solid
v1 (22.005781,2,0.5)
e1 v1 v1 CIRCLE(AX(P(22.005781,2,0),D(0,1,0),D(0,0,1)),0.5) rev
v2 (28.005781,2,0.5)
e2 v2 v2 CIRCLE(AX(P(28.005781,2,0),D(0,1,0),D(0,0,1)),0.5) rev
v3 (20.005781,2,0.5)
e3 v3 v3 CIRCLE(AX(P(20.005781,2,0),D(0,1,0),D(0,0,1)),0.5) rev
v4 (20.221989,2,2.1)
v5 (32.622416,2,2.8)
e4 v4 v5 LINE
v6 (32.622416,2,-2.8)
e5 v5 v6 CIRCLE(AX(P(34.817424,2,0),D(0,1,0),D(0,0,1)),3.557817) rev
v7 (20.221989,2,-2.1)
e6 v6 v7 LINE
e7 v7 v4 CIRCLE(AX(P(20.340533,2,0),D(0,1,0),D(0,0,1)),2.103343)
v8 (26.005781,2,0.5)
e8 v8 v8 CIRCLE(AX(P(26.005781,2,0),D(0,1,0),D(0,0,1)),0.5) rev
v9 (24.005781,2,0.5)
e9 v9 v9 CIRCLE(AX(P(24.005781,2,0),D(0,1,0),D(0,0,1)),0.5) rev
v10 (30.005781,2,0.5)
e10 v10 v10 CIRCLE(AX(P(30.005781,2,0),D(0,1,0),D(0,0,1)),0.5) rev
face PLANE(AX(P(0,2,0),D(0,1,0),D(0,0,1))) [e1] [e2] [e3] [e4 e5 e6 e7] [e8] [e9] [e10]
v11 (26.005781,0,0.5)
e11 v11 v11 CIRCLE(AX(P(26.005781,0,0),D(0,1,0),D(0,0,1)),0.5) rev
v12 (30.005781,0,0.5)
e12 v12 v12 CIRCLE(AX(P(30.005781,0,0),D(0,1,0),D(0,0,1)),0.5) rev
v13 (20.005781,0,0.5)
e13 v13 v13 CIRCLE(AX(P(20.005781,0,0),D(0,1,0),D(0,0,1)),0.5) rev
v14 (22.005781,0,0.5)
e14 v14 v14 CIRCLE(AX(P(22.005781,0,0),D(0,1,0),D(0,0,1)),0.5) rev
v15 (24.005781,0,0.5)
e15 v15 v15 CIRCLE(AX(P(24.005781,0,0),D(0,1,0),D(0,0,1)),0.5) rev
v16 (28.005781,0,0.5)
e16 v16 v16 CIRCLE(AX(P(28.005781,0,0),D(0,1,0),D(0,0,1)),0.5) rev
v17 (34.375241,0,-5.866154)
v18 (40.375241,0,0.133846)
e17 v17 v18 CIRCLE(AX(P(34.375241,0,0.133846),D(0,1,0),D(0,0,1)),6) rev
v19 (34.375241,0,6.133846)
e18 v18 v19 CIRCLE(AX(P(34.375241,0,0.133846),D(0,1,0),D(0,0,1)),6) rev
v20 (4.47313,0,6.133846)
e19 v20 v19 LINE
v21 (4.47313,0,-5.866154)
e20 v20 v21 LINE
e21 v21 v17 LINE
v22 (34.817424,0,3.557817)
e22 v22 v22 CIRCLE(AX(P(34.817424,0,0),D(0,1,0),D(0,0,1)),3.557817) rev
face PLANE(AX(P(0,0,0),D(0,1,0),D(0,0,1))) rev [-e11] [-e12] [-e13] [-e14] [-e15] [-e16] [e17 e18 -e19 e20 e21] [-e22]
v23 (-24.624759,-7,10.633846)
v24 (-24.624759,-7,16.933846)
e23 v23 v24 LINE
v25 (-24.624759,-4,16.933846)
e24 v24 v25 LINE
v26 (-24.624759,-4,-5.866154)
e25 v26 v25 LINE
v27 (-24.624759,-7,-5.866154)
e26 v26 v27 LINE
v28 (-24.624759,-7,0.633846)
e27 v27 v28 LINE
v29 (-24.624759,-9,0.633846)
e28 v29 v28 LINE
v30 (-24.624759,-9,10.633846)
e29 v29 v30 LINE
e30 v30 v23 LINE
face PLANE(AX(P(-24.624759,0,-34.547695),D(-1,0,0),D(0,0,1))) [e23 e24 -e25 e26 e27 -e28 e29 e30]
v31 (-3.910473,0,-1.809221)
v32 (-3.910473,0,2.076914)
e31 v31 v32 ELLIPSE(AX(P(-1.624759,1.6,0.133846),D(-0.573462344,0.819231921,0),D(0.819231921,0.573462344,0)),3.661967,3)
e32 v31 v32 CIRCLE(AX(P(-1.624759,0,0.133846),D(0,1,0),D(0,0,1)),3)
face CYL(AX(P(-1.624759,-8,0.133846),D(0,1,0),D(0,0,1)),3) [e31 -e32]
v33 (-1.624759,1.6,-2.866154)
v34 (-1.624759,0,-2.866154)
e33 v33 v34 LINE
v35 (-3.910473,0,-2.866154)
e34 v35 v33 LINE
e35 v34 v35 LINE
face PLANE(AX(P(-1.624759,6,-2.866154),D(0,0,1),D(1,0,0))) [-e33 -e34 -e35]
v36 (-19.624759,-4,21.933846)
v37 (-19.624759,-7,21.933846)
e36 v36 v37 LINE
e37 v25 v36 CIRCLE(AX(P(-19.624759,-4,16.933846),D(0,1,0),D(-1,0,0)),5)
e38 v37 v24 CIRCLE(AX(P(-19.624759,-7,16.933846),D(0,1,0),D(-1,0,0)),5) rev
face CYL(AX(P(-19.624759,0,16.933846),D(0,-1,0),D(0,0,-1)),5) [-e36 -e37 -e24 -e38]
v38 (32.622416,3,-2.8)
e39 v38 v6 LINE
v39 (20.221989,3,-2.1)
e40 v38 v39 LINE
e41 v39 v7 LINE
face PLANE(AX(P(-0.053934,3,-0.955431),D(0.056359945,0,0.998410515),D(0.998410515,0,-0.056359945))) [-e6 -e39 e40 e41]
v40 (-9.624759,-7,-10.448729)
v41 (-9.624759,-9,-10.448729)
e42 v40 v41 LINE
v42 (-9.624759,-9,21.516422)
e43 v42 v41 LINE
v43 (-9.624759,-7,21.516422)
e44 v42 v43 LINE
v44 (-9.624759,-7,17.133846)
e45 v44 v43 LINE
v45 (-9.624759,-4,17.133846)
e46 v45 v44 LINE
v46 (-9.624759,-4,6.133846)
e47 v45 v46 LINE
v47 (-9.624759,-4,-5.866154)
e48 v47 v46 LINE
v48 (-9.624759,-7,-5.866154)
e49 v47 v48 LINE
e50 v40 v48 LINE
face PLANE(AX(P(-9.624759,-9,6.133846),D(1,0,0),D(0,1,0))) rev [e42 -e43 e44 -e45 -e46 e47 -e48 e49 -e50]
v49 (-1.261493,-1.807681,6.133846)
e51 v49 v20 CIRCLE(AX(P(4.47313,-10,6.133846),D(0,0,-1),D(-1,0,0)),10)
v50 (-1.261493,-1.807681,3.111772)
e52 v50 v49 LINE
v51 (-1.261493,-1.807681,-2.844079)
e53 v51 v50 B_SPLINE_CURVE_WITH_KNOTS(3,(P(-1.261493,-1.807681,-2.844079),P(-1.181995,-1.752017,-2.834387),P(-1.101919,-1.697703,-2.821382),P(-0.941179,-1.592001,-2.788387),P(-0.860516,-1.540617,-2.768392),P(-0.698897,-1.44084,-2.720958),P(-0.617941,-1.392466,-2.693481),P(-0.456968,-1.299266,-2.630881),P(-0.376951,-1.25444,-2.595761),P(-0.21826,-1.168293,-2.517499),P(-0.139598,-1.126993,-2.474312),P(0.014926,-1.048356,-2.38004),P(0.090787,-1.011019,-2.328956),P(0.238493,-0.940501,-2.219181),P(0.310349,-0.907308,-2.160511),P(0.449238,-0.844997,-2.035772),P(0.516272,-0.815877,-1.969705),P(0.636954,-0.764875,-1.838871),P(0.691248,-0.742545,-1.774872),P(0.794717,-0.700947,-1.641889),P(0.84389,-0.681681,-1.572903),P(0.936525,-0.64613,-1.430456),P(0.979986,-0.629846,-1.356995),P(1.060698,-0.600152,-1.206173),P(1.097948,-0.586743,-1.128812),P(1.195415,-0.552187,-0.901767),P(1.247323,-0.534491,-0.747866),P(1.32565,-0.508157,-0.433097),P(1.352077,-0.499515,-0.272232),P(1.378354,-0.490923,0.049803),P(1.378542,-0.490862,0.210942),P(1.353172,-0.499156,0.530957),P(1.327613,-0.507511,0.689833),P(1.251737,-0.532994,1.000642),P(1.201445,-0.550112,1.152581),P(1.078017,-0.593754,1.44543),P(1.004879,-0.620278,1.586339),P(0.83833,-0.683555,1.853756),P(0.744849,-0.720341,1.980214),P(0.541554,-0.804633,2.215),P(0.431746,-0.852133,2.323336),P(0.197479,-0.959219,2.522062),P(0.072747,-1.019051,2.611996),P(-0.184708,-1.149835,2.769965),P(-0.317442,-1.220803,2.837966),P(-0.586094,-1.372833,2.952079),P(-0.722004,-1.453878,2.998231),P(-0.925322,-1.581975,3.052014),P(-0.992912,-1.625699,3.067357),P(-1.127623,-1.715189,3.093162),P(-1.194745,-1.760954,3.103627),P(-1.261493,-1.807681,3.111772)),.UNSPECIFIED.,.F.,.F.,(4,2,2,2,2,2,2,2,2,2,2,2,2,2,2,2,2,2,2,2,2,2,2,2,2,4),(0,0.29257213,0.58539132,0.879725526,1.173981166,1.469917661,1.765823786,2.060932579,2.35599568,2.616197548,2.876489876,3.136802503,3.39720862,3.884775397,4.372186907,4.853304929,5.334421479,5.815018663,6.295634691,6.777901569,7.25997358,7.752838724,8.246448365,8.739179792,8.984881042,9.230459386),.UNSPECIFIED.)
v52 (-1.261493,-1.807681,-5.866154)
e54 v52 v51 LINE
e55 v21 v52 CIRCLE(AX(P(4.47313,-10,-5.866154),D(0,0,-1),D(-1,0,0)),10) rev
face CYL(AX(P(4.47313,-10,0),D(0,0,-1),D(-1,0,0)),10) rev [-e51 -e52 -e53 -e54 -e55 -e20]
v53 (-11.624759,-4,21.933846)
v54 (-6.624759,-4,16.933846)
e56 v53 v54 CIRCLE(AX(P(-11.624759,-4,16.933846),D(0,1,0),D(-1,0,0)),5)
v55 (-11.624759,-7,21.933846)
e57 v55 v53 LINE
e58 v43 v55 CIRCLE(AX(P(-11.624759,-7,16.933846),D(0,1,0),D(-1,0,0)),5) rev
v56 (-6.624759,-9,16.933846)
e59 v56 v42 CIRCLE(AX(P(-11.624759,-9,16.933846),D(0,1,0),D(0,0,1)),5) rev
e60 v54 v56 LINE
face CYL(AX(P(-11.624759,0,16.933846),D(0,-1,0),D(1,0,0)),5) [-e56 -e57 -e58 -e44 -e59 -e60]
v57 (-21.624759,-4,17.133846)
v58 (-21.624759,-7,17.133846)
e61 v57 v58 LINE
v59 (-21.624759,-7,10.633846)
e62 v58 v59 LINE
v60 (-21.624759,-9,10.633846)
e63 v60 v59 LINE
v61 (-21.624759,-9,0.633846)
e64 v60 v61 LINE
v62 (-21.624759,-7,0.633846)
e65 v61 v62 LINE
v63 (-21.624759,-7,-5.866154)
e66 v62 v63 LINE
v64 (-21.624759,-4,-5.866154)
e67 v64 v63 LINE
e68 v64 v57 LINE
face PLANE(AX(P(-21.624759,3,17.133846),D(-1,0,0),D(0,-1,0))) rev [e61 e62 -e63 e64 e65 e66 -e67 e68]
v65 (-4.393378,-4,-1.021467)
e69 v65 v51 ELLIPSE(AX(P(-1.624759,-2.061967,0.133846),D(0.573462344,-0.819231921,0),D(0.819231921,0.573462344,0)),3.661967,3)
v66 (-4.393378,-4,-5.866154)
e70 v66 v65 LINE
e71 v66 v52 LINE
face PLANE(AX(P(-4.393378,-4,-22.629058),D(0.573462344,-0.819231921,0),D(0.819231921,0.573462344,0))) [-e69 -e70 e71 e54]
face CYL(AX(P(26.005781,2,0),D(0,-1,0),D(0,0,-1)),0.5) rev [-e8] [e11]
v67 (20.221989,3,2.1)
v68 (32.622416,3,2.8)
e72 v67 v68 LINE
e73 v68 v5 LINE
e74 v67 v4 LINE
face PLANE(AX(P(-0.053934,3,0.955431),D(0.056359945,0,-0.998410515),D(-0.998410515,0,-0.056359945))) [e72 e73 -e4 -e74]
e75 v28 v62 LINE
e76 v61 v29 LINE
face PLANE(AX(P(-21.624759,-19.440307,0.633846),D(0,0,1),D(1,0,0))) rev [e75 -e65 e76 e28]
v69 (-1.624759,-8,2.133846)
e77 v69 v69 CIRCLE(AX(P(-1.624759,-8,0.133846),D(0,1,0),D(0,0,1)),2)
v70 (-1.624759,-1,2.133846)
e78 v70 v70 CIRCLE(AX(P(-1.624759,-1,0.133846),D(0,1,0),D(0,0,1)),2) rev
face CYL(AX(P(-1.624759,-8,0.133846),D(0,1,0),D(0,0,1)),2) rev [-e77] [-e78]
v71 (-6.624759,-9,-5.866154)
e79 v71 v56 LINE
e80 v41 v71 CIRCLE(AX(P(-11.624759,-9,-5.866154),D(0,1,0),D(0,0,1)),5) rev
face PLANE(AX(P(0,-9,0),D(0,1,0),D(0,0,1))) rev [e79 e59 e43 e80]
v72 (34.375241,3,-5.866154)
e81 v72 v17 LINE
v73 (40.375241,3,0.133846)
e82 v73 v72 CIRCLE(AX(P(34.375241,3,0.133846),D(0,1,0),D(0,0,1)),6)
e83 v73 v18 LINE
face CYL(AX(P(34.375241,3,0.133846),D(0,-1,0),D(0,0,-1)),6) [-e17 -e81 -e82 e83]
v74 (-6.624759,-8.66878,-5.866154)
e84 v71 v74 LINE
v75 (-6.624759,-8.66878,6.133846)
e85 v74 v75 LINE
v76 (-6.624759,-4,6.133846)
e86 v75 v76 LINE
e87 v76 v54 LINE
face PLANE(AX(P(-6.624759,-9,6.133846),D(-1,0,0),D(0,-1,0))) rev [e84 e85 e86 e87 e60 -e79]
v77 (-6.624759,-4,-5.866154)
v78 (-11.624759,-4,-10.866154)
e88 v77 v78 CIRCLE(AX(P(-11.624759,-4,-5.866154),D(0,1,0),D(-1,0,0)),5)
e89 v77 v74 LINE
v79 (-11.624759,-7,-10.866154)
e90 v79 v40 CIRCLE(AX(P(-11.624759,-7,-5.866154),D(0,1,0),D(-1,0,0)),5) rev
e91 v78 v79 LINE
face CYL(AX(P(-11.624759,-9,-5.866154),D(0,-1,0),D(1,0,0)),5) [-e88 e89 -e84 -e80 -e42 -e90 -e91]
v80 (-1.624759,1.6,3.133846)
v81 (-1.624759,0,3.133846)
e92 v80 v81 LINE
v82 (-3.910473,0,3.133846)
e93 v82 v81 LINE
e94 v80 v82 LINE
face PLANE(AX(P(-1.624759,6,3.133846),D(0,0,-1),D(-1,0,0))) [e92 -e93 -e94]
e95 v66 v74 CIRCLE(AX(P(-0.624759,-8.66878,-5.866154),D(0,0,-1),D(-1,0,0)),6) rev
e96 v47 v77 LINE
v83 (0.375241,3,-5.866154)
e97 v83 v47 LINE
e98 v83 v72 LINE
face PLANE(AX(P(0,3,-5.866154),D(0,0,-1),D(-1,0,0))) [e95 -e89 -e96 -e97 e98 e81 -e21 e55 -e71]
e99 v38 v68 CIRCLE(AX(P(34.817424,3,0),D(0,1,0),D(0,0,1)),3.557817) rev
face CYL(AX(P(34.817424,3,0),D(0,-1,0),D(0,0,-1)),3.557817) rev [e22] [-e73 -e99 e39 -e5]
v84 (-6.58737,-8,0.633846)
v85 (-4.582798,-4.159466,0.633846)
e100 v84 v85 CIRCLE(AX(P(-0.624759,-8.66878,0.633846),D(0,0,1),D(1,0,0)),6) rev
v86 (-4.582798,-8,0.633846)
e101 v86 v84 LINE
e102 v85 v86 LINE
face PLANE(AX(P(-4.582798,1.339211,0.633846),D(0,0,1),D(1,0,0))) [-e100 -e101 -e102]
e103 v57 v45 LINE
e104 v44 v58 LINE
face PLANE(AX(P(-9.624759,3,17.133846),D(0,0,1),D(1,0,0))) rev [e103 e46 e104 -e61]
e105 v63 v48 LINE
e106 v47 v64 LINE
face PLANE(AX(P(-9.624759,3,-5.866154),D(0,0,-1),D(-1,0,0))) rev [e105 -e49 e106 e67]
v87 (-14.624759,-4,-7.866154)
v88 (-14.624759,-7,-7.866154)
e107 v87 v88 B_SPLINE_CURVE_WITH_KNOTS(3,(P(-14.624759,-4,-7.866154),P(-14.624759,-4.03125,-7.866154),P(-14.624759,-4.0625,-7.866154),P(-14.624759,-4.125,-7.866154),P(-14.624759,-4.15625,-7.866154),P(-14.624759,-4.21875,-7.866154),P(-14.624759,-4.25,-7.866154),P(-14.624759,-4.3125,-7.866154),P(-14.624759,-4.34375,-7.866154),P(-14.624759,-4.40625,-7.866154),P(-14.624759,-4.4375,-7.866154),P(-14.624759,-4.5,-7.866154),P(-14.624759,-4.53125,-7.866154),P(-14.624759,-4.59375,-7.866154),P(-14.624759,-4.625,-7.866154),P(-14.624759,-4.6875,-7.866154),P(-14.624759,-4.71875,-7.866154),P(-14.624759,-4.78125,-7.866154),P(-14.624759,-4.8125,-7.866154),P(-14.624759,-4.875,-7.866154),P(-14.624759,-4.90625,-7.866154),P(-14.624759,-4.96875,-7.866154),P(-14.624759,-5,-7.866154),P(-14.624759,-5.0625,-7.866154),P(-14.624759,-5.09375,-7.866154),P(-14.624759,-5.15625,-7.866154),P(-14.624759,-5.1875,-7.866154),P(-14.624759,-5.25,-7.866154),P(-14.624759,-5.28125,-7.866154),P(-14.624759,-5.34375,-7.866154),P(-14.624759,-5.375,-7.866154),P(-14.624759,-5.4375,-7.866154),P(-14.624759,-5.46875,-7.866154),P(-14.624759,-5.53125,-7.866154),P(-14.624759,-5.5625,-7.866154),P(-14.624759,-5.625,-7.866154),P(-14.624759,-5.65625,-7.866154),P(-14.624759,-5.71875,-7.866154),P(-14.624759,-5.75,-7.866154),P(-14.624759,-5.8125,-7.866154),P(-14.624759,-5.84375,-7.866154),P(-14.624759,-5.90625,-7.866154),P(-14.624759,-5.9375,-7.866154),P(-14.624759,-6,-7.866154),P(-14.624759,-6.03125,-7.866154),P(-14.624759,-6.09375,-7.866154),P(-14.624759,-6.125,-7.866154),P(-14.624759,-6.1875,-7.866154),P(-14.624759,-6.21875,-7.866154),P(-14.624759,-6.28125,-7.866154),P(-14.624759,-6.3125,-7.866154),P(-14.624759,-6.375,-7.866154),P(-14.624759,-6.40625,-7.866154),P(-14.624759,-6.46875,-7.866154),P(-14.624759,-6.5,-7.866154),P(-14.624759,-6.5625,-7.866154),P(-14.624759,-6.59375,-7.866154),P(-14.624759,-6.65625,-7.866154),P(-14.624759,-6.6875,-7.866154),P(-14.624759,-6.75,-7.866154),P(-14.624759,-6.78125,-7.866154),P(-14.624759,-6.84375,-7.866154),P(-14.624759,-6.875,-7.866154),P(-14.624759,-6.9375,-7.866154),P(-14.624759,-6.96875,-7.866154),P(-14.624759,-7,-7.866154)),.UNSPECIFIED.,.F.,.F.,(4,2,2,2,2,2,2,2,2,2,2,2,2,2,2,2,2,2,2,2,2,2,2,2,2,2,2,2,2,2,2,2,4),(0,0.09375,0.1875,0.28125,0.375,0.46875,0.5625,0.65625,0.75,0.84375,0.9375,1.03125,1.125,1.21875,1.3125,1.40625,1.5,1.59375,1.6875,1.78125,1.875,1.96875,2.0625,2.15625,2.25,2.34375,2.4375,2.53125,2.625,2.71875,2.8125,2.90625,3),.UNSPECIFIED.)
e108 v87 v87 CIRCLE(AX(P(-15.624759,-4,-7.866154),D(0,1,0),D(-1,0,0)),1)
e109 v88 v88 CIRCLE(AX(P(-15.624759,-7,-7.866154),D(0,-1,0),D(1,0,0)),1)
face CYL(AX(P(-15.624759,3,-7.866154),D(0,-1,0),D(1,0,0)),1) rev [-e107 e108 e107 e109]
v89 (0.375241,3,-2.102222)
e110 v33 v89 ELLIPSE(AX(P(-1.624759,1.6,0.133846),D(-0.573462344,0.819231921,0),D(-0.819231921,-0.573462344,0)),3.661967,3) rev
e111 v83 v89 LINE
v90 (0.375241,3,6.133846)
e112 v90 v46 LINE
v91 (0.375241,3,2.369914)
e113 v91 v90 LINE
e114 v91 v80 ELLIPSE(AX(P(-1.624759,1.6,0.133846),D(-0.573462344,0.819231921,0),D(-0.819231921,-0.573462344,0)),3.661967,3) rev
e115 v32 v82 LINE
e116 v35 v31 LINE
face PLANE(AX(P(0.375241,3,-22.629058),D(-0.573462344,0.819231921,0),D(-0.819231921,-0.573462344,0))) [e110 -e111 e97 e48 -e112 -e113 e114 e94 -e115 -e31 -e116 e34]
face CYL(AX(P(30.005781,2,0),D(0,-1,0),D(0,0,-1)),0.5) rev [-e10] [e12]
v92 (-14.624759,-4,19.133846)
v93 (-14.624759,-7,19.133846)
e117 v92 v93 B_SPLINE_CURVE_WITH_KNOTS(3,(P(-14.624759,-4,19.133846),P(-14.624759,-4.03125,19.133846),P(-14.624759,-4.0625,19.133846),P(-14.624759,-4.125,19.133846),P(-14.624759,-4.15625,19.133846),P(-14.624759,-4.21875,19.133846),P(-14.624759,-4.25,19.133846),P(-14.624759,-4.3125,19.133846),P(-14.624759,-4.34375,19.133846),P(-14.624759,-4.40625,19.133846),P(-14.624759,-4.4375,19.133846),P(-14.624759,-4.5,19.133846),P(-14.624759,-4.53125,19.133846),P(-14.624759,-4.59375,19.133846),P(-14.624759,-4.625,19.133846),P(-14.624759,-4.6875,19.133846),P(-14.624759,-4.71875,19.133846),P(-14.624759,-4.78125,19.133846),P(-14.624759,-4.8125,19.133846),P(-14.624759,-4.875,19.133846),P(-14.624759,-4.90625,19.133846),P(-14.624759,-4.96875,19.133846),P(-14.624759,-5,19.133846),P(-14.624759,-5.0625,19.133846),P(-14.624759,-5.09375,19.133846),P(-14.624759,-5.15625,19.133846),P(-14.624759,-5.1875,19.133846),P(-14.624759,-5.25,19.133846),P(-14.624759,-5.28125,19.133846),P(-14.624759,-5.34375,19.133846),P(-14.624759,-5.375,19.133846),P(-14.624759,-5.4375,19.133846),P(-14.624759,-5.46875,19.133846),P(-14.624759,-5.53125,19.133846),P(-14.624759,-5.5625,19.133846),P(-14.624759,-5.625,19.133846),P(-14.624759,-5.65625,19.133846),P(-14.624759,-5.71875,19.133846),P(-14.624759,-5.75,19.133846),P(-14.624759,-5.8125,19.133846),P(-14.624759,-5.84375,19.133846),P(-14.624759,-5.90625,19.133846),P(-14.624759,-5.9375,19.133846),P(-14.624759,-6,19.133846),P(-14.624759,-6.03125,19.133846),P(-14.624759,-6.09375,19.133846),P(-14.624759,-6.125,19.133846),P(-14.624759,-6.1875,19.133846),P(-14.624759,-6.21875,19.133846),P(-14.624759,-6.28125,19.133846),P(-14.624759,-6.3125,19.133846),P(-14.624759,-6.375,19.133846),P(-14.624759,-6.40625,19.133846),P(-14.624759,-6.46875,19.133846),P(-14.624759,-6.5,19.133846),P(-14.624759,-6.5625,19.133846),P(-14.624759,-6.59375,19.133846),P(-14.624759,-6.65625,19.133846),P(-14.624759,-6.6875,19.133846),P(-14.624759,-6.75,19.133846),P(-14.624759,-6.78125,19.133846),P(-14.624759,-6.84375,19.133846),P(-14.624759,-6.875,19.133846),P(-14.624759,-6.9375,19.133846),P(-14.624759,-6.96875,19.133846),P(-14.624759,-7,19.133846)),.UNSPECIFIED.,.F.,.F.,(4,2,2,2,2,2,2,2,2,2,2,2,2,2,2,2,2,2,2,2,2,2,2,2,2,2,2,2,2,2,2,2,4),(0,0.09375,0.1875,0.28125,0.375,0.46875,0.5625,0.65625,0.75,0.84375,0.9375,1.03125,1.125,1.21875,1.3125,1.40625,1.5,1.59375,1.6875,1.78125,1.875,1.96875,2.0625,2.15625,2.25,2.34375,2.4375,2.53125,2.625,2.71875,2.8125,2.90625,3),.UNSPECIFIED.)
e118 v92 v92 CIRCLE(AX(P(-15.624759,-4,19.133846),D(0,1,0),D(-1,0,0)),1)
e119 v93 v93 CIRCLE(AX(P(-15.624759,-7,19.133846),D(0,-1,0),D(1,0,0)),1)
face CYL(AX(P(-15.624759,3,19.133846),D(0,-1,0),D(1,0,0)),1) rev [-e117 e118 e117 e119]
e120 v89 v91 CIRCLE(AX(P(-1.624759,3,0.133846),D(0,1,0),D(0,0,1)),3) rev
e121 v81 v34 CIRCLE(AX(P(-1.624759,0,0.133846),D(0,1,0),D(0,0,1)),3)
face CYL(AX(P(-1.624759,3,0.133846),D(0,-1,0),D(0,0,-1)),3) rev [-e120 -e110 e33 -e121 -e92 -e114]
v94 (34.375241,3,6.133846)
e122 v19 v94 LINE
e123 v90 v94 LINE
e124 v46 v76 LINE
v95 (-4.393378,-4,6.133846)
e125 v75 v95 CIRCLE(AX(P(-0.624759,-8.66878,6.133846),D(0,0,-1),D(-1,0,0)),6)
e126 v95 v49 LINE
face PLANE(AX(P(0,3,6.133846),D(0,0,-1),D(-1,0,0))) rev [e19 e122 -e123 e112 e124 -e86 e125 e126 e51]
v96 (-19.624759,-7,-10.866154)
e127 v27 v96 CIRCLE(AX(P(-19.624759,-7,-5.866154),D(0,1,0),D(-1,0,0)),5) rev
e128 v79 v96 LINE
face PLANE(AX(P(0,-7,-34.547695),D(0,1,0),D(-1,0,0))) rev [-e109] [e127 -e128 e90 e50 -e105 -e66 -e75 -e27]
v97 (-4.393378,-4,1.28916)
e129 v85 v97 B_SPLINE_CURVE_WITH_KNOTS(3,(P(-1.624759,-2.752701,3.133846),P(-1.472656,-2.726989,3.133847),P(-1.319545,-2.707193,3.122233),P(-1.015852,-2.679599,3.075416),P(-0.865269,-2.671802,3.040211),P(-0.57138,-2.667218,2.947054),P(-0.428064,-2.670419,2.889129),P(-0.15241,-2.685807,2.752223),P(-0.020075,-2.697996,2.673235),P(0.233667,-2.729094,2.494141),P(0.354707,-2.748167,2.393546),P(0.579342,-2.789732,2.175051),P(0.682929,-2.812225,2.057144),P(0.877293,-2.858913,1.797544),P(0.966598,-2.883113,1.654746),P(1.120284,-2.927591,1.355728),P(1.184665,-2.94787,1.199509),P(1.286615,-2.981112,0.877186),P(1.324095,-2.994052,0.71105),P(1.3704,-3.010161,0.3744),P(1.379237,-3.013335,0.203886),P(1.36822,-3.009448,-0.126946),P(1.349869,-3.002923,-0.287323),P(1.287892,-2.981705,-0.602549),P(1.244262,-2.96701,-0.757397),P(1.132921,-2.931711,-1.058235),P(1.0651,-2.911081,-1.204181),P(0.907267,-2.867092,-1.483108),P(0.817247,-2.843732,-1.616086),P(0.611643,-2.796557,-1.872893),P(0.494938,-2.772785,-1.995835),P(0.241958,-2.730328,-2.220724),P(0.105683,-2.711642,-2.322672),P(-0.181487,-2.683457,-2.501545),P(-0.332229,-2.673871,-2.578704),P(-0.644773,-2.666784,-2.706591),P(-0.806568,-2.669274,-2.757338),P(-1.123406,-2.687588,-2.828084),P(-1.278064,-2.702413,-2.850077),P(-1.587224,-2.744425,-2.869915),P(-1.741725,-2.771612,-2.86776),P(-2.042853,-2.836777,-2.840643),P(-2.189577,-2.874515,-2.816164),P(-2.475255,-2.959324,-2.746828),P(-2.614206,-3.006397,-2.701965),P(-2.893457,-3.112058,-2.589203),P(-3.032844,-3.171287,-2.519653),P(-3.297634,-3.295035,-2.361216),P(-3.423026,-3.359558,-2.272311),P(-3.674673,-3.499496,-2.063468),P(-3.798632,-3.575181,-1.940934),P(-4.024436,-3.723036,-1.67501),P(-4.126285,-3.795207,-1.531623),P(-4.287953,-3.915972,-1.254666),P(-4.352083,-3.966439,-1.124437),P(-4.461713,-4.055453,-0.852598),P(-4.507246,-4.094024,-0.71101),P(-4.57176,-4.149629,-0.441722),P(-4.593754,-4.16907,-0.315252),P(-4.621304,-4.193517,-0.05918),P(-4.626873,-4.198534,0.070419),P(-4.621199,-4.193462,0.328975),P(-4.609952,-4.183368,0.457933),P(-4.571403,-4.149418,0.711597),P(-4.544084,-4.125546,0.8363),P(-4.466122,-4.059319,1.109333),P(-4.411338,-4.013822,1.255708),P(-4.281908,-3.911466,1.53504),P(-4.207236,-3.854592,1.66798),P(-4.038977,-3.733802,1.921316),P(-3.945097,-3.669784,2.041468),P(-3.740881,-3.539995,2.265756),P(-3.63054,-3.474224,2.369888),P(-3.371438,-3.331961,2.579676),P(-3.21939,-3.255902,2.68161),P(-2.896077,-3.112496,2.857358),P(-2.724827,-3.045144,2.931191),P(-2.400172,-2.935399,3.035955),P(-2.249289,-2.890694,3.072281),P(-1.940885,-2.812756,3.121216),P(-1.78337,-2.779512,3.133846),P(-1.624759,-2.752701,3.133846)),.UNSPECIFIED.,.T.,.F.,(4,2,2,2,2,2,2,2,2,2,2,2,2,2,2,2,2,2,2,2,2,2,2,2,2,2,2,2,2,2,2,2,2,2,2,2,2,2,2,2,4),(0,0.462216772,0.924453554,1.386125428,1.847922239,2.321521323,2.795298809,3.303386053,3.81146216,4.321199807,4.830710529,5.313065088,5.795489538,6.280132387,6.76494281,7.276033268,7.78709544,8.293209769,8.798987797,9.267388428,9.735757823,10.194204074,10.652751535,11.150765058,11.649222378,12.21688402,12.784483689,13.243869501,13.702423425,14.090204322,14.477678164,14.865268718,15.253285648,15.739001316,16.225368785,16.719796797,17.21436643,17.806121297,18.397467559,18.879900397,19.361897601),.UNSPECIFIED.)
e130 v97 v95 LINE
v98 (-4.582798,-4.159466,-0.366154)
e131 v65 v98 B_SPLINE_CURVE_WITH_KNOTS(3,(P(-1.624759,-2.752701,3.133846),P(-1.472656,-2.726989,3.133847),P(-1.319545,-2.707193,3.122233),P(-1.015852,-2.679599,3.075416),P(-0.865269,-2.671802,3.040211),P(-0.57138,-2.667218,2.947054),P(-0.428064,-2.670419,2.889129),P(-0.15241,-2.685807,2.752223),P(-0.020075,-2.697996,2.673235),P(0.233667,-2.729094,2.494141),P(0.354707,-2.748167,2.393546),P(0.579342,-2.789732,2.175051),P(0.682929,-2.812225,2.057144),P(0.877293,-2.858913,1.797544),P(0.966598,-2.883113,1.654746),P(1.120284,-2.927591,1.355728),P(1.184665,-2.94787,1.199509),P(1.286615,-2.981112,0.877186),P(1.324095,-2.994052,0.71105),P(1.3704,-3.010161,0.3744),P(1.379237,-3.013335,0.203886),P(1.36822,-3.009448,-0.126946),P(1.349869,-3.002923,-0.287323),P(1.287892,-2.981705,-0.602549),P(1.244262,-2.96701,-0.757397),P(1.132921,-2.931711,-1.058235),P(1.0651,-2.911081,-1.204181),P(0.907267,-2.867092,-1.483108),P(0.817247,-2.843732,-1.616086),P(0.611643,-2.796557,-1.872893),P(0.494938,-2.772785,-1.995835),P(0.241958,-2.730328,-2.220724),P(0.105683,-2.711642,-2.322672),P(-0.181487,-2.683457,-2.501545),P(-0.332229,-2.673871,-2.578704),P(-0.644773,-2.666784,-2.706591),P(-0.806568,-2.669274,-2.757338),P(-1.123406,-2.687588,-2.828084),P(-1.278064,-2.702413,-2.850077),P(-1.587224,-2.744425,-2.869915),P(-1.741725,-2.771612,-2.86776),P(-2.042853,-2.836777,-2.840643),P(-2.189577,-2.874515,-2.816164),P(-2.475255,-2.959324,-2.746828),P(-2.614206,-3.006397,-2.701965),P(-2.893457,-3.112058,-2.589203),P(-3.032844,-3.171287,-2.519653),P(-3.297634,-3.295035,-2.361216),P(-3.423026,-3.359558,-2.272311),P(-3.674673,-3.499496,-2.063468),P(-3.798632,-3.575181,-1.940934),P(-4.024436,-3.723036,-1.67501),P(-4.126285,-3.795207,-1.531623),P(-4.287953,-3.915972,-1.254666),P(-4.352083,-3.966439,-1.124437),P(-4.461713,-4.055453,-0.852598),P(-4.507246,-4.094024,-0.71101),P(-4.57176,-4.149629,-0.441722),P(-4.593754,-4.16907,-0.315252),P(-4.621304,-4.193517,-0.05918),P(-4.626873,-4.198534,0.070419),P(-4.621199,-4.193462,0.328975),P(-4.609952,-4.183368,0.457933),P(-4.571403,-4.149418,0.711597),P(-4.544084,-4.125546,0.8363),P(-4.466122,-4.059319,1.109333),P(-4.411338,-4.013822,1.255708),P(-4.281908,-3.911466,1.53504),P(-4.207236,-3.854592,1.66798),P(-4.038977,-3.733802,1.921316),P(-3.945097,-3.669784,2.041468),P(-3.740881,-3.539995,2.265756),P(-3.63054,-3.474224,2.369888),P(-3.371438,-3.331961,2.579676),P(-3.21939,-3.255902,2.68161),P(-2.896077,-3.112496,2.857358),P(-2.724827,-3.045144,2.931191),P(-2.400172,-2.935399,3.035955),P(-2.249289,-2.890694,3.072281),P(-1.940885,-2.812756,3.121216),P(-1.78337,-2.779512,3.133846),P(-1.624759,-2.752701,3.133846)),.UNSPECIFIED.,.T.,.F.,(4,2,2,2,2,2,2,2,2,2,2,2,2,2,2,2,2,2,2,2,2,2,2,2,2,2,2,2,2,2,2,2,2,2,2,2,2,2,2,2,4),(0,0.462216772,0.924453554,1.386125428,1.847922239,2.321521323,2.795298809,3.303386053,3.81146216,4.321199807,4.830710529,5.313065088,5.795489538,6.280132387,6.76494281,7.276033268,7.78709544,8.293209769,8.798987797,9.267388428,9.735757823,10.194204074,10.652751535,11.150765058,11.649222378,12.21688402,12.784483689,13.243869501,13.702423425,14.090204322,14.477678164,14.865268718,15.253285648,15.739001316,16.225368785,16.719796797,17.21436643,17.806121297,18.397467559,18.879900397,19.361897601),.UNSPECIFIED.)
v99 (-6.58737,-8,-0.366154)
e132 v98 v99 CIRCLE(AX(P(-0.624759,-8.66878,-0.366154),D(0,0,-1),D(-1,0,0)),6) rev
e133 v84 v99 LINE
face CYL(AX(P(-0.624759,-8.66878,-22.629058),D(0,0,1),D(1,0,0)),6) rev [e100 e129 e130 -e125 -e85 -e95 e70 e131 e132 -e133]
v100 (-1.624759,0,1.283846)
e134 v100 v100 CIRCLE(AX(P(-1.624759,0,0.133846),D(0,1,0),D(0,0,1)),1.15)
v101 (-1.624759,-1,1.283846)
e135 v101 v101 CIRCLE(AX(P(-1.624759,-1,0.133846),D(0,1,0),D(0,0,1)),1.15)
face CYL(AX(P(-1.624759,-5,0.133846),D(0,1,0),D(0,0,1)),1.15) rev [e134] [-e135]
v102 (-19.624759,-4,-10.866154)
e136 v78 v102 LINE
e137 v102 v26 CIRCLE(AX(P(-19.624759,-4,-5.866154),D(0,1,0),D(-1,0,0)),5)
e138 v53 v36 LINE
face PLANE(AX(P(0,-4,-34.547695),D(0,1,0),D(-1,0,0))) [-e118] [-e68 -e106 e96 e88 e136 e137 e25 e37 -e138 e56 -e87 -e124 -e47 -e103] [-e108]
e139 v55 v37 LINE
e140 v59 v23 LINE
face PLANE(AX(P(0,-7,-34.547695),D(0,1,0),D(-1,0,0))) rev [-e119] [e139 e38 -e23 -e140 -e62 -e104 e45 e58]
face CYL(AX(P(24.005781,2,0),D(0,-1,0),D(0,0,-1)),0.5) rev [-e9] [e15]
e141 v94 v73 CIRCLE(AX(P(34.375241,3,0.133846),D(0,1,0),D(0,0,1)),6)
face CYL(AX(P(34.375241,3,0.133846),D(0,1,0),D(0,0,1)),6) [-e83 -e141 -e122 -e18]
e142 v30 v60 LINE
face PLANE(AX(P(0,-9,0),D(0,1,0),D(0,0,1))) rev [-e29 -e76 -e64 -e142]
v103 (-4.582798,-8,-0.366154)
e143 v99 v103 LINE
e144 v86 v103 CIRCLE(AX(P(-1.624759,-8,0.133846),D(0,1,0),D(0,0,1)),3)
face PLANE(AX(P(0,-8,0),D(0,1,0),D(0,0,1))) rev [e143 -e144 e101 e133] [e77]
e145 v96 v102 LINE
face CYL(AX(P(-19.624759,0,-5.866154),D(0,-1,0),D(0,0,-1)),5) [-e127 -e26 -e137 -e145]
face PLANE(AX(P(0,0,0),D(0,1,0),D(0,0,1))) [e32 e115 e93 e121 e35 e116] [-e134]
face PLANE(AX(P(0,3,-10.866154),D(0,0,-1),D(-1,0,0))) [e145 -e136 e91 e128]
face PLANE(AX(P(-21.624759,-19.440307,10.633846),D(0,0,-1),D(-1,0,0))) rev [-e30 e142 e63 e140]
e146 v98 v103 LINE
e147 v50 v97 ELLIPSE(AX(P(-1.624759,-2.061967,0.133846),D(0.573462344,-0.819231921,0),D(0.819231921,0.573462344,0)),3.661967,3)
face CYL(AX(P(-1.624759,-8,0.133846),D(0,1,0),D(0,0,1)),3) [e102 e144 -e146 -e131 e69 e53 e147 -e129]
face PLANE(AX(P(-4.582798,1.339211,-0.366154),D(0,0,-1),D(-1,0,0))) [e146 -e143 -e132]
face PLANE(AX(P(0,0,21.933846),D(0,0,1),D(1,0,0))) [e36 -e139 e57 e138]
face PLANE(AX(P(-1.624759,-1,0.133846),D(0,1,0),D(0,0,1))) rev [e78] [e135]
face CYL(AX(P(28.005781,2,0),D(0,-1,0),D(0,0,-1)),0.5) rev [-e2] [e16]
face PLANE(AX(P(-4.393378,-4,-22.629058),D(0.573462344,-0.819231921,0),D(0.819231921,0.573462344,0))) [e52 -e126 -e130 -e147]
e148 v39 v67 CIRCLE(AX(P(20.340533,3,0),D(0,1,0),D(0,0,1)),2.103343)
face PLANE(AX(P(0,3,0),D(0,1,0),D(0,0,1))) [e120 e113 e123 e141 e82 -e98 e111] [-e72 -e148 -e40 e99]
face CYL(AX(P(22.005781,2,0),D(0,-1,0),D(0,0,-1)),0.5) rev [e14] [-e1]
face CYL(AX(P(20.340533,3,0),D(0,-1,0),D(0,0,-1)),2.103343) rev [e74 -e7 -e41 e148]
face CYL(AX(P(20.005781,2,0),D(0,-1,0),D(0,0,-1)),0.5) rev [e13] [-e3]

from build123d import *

# Parameters (mm, degrees)
BOSS_EXTRUDE1_DEPTH     = 3
SKETCH1_7_R             = 0.5
BOSS_EXTRUDE2_DEPTH     = 2
BOSS_EXTRUDE4_REACH     = 44.227
SKETCH4_W               = 3
SKETCH4_H               = 12
BOSS_EXTRUDE5_DEPTH     = 5
FILLET3_R               = 10
BOSS_EXTRUDE11_START    = -17
BOSS_EXTRUDE11_DEPTH    = 32.8
SKETCH12_R              = 1
SKETCH12_W              = 12
SKETCH12_H              = 23
CUT_EXTRUDE2_DEPTH      = 48.02396982
FILLET7_R               = 6
FILLET8_R               = 6
SKETCH13_W              = 3
SKETCH13_H              = 10
BOSS_EXTRUDE12_DEPTH    = 2
FILLET9_R               = 5
BOSS_EXTRUDE13_START    = -8
SKETCH1_9_R             = 3
SKETCH1_9_R_2           = 2
BOSS_EXTRUDE13_DEPTH    = 8
CUT_EXTRUDE3_DEPTH      = 8
CUT_EXTRUDE3_DEPTH_BACK = 8
SKETCH1_10_R            = 2
SKETCH1_10_R_2          = 1.15
BOSS_EXTRUDE14_START    = -1
SKETCH1_11_R            = 2
BOSS_EXTRUDE14_DEPTH    = 1
SKETCH1_12_R            = 3
CUT_EXTRUDE4_DEPTH      = 5
SKETCH1_13_R            = 1.15
CUT_EXTRUDE5_DEPTH      = 5
SKETCH17_W              = 11.286302552
SKETCH17_H              = 6
CUT_EXTRUDE6_DEPTH      = 6
BOSS_EXTRUDE15_START    = -3.840535
SKETCH18_W              = 2.041960109
SKETCH18_H              = 1
BOSS_EXTRUDE15_DEPTH    = 3.840535


# Read off the part's stored shape, not the designer's step: Boss-Extrude11
# Some blends are built 0.0001 mm under size
with BuildPart() as part:
    # Sketch1 → Boss-Extrude1 (new body)
    with BuildSketch(Plane(origin=(0, 0, 0), x_dir=(1, 0, 0), z_dir=(0, 1, 0))):
        with BuildLine():
            Line((40.375241408, 5.866153579), (0.375241408, 5.866153579))
            Line((0.375241408, 5.866153579), (0.375241408, 2.102221557))
            ThreePointArc((0.375241408, 2.102221557), (1.113854196, 1.090898451), (1.375241408, -0.133846421))
            ThreePointArc((1.375241408, -0.133846421), (1.113854196, -1.358591292), (0.375241408, -2.369914398))
            Line((0.375241408, -2.369914398), (0.375241408, -6.133846421))
            Line((0.375241408, -6.133846421), (40.375241408, -6.133846421))
            Line((40.375241408, -6.133846421), (40.375241408, 5.866153579))
        make_face()
        with BuildLine():
            Line((32.622415803, -2.8), (20.221989119, -2.1))
            ThreePointArc((20.221989119, -2.1), (18.237190195, 0), (20.221989119, 2.1))
            Line((20.221989119, 2.1), (32.622415803, 2.8))
            ThreePointArc((32.622415803, 2.8), (36.374444489, 3.199023384), (38.375241408, 0))
            ThreePointArc((38.375241408, 0), (36.374444489, -3.199023384), (32.622415803, -2.8))
        make_face(mode=Mode.SUBTRACT)
    extrude(amount=BOSS_EXTRUDE1_DEPTH)

    # Sketch1<7> → Boss-Extrude2 (add)
    with BuildSketch(Plane(origin=(0, 0, 0), x_dir=(1, 0, 0), z_dir=(0, 1, 0))):
        with BuildLine():
            ThreePointArc((20.221989119, 2.1), (18.237190195, 0), (20.221989119, -2.1))
            Line((20.221989119, -2.1), (32.622415803, -2.8))
            ThreePointArc((32.622415803, -2.8), (31.259607239, 0), (32.622415803, 2.8))
            Line((32.622415803, 2.8), (20.221989119, 2.1))
        make_face()
        with Locations(Location((20.005781193, 0, 0), (0, 0, 270))):
            Circle(SKETCH1_7_R, mode=Mode.SUBTRACT)
        with Locations(Location((22.005781193, 0, 0), (0, 0, 270))):
            Circle(SKETCH1_7_R, mode=Mode.SUBTRACT)
        with Locations(Location((24.005781193, 0, 0), (0, 0, 270))):
            Circle(SKETCH1_7_R, mode=Mode.SUBTRACT)
        with Locations(Location((26.005781193, 0, 0), (0, 0, 270))):
            Circle(SKETCH1_7_R, mode=Mode.SUBTRACT)
        with Locations(Location((28.005781193, 0, 0), (0, 0, 270))):
            Circle(SKETCH1_7_R, mode=Mode.SUBTRACT)
        with Locations(Location((30.005781193, 0, 0), (0, 0, 270))):
            Circle(SKETCH1_7_R, mode=Mode.SUBTRACT)
    extrude(amount=BOSS_EXTRUDE2_DEPTH)

    # Boss-Extrude4: up to this face of the body (flat: up to its plane)
    boss_extrude4_end = Plane(part.part.faces().sort_by_distance((20.375241408, 1.5, -5.866153579))[0])
    # Sketch3 → Boss-Extrude4 (add, up to the picked face)
    with BuildSketch(Plane.XY.offset(6.133846421), mode=Mode.PRIVATE) as boss_extrude4_sk1:
        Polygon((0.375241408, 3), (-9.624758592, -4), (-4.393377613, -4), (5.606622387, 3), align=None)
    boss_extrude4_tool1 = split(extrude(boss_extrude4_sk1.sketch, amount=-BOSS_EXTRUDE4_REACH, mode=Mode.PRIVATE), bisect_by=boss_extrude4_end, keep=Keep.BOTH, mode=Mode.PRIVATE)
    add(boss_extrude4_tool1.solids().sort_by(Axis((-2.009068, -0.5, 6.133846), (0, 0, -1)))[0])

    # Sketch4 → Boss-Extrude5 (add)
    with BuildSketch(Plane(origin=(0, -4, 0), x_dir=(-1, 0, 0), z_dir=(0, -1, 0))):
        with Locations((8.124758592, -0.133846421)):
            Rectangle(SKETCH4_W, SKETCH4_H)
    extrude(amount=BOSS_EXTRUDE5_DEPTH)

    # Fillet3
    # the kernel refuses this fillet: 10 mm, written as the material it adds along each edge
    with BuildSketch(Plane(origin=(1.320908101, 0, 6.133846421), x_dir=(1, 0, 0), z_dir=(0, 0, -1))) as fillet3_piece_1_section:
        with BuildLine():
            CenterArc((FILLET3_R * 0.315222230819, FILLET3_R), FILLET3_R, 235.007979801, 34.992020199)
            Line((-FILLET3_R * 0.258240113544, FILLET3_R * 0.180768079481), (0, 0))
            Line((0, 0), (FILLET3_R * 0.315222230819, 0))
        make_face()
    fillet3_piece_1 = extrude(amount=13.312182885, mode=Mode.PRIVATE)
    fillet3_piece_1 = split(fillet3_piece_1, bisect_by=Plane(origin=(1.586628452, -0.313093782, -5.866153579), z_dir=(0, 0, 1)), keep=Keep.TOP, mode=Mode.PRIVATE)
    fillet3_piece_1 = fillet3_piece_1 - Plane(origin=(-1.624758592, -0.313093782, 0.133846421), x_dir=(0.6666666666666657, 0, -0.7453559924999308), z_dir=(0, -1, 0)) * Cylinder(3, 40, mode=Mode.PRIVATE)
    add(fillet3_piece_1)
    with BuildSketch(Plane(origin=(1.320908101, 0, 7.446029306), x_dir=(1, 0, 0), z_dir=(0, 0, -1))) as fillet3_piece_2_section:
        with BuildLine():
            CenterArc((FILLET3_R * 0.315222230819, FILLET3_R), FILLET3_R, 235.007979801, 34.992020199)
            Line((-FILLET3_R * 0.258240113544, FILLET3_R * 0.180768079481), (0, 0))
            Line((0, 0), (FILLET3_R * 0.315222230819, 0))
        make_face()
    fillet3_piece_2 = extrude(amount=13.312182885, mode=Mode.PRIVATE)
    fillet3_piece_2 = split(fillet3_piece_2, bisect_by=Plane(origin=(1.586628452, -0.313093782, 6.133846421), z_dir=(0, 0, -1)), keep=Keep.TOP, mode=Mode.PRIVATE)
    fillet3_piece_2 = fillet3_piece_2 - Plane(origin=(-1.624758592, -0.313093782, 0.133846421), x_dir=(0.6666666666666657, 0, -0.7453559924999308), z_dir=(0, -1, 0)) * Cylinder(3, 40, mode=Mode.PRIVATE)
    add(fillet3_piece_2)

    # Boss-Extrude11 outline → Boss-Extrude11 (add)
    with BuildSketch(Plane.XY.offset(6.133846421).offset(BOSS_EXTRUDE11_START)):
        Polygon((-9.624758592, -7), (-9.624758592, -9), (-6.624758592, -9), (-6.624758592, -4), (-24.624758592, -4), (-24.624758592, -7), align=None)
    extrude(amount=BOSS_EXTRUDE11_DEPTH)

    # Sketch12 → Cut-Extrude2 (cut, through all)
    with BuildSketch(Plane(origin=(0, -7, 0), x_dir=(-1, 0, 0), z_dir=(0, -1, 0))):
        with Locations(Location((15.624758592, -19.133846421, 0), (0, 0, 180))):
            Circle(SKETCH12_R)
        with Locations(Location((15.624758592, 7.866153579, 0), (0, 0, 180))):
            Circle(SKETCH12_R)
        with Locations((15.624758592, -5.633846421)):
            Rectangle(SKETCH12_W, SKETCH12_H)
    extrude(amount=-CUT_EXTRUDE2_DEPTH, mode=Mode.SUBTRACT)

    # Fillet7
    fillet7_edges = [part.edges().sort_by_distance(p)[0] for p in [
        (40.375241408, 1.5, -5.866153579),
        (40.375241408, 1.5, 6.133846421),
    ]]
    fillet(fillet7_edges, radius=FILLET7_R - 0.0001)  # a hair under: the kernel refuses the full size

    # Fillet8
    # the kernel refuses this fillet: 6 mm, written as the material it adds along each edge
    with BuildSketch(Plane(origin=(-6.624758592, -4, -5.866153579), x_dir=(1, 0, 0), z_dir=(0, 0, 1))) as fillet8_piece_1:
        with BuildLine():
            CenterArc((6, -4.668780426), FILLET8_R, 128.910316117, 51.089683883)
            Line((0, -4.668780426), (0, 0))
            Line((0, 0), (2.231380978, 0))
        make_face()
    extrude(amount=12)

    # Sketch13 → Boss-Extrude12 (add)
    with BuildSketch(Plane.XZ.offset(7)):
        with Locations((-23.124758592, 5.633846421)):
            Rectangle(SKETCH13_W, SKETCH13_H)
    extrude(amount=BOSS_EXTRUDE12_DEPTH)

    # Fillet9
    # the kernel refuses this fillet: 5 mm, written as the material it takes off along each edge
    with BuildSketch(Plane(origin=(-6.624758592, -21.5, -10.866153579), x_dir=(0, 0, 1), z_dir=(0, 1, 0))) as fillet9_piece_1:
        with BuildLine():
            CenterArc((FILLET9_R, -FILLET9_R), FILLET9_R, 90, 90)
            Line((0, -FILLET9_R), (0, 0))
            Line((0, 0), (FILLET9_R, 0))
        make_face()
    extrude(amount=30, mode=Mode.SUBTRACT)
    with BuildSketch(Plane(origin=(-24.624758592, 8.5, -10.866153579), x_dir=(1, 0, 0), z_dir=(0, -1, 0))) as fillet9_piece_2:
        with BuildLine():
            CenterArc((FILLET9_R, FILLET9_R), FILLET9_R, 180, 90)
            Line((0, FILLET9_R), (0, 0))
            Line((0, 0), (FILLET9_R, 0))
        make_face()
    extrude(amount=28, mode=Mode.SUBTRACT)
    with BuildSketch(Plane(origin=(-24.624758592, 8.5, 21.933846421), x_dir=(1, 0, 0), z_dir=(0, -1, 0))) as fillet9_piece_3:
        with BuildLine():
            CenterArc((FILLET9_R, -FILLET9_R), FILLET9_R, 90, 90)
            Line((0, -FILLET9_R), (0, 0))
            Line((0, 0), (FILLET9_R, 0))
        make_face()
    extrude(amount=28, mode=Mode.SUBTRACT)
    with BuildSketch(Plane(origin=(-6.624758592, -21.5, 21.933846421), x_dir=(0, 0, -1), z_dir=(0, 1, 0))) as fillet9_piece_4:
        with BuildLine():
            CenterArc((FILLET9_R, FILLET9_R), FILLET9_R, 180, 90)
            Line((0, FILLET9_R), (0, 0))
            Line((0, 0), (FILLET9_R, 0))
        make_face()
    extrude(amount=30, mode=Mode.SUBTRACT)

    # Sketch1<9> → Boss-Extrude13 (add)
    with BuildSketch(Plane(origin=(0, 0, 0), x_dir=(1, 0, 0), z_dir=(0, 1, 0)).offset(BOSS_EXTRUDE13_START)):
        with Locations(Location((-1.624758592, -0.133846421, 0), (0, 0, 270))):
            Circle(SKETCH1_9_R)
        with Locations(Location((-1.624758592, -0.133846421, 0), (0, 0, 270))):
            Circle(SKETCH1_9_R_2, mode=Mode.SUBTRACT)
    extrude(amount=BOSS_EXTRUDE13_DEPTH)

    # Sketch1<10> → Cut-Extrude3 (cut, two sides: drawn at the far end of the back side and taken through both)
    with BuildSketch(Plane(origin=(0, 0, 0), x_dir=(1, 0, 0), z_dir=(0, 1, 0)).offset(-CUT_EXTRUDE3_DEPTH_BACK)):
        with Locations(Location((-1.624758592, -0.133846421, 0), (0, 0, 270))):
            Circle(SKETCH1_10_R)
        with Locations((-1.624758592, -0.133846421)):
            Circle(SKETCH1_10_R_2)
    extrude(amount=CUT_EXTRUDE3_DEPTH + CUT_EXTRUDE3_DEPTH_BACK, mode=Mode.SUBTRACT)

    # Sketch1<11> → Boss-Extrude14 (add)
    with BuildSketch(Plane(origin=(0, 0, 0), x_dir=(1, 0, 0), z_dir=(0, 1, 0)).offset(BOSS_EXTRUDE14_START)):
        with Locations(Location((-1.624758592, -0.133846421, 0), (0, 0, 270))):
            Circle(SKETCH1_11_R)
    extrude(amount=BOSS_EXTRUDE14_DEPTH)

    # Sketch1<12> → Cut-Extrude4 (cut)
    with BuildSketch(Plane(origin=(0, 0, 0), x_dir=(1, 0, 0), z_dir=(0, 1, 0))):
        with Locations(Location((-1.624758592, -0.133846421, 0), (0, 0, 270))):
            Circle(SKETCH1_12_R)
    extrude(amount=CUT_EXTRUDE4_DEPTH, mode=Mode.SUBTRACT)

    # Sketch1<13> → Cut-Extrude5 (cut)
    with BuildSketch(Plane(origin=(0, 0, 0), x_dir=(1, 0, 0), z_dir=(0, 1, 0))):
        with Locations(Location((-1.624758592, -0.133846421, 0), (0, 0, 270))):
            Circle(SKETCH1_13_R)
    extrude(amount=-CUT_EXTRUDE5_DEPTH, mode=Mode.SUBTRACT)

    # Sketch17 → Cut-Extrude6 (cut)
    with BuildSketch(Plane(origin=(0, 0, 0), x_dir=(1, 0, 0), z_dir=(0, 1, 0))):
        with Locations((-7.267909868, -0.133846421)):
            Rectangle(SKETCH17_W, SKETCH17_H)
    extrude(amount=CUT_EXTRUDE6_DEPTH, mode=Mode.SUBTRACT)

    # Sketch18 → Boss-Extrude15 (add)
    with BuildSketch(Plane(origin=(0, -8, 0), x_dir=(-1, 0, 0), z_dir=(0, -1, 0)).offset(BOSS_EXTRUDE15_START)):
        with Locations((5.603778538, -0.133846421)):
            Rectangle(SKETCH18_W, SKETCH18_H)
    extrude(amount=BOSS_EXTRUDE15_DEPTH)


solid = part.part
